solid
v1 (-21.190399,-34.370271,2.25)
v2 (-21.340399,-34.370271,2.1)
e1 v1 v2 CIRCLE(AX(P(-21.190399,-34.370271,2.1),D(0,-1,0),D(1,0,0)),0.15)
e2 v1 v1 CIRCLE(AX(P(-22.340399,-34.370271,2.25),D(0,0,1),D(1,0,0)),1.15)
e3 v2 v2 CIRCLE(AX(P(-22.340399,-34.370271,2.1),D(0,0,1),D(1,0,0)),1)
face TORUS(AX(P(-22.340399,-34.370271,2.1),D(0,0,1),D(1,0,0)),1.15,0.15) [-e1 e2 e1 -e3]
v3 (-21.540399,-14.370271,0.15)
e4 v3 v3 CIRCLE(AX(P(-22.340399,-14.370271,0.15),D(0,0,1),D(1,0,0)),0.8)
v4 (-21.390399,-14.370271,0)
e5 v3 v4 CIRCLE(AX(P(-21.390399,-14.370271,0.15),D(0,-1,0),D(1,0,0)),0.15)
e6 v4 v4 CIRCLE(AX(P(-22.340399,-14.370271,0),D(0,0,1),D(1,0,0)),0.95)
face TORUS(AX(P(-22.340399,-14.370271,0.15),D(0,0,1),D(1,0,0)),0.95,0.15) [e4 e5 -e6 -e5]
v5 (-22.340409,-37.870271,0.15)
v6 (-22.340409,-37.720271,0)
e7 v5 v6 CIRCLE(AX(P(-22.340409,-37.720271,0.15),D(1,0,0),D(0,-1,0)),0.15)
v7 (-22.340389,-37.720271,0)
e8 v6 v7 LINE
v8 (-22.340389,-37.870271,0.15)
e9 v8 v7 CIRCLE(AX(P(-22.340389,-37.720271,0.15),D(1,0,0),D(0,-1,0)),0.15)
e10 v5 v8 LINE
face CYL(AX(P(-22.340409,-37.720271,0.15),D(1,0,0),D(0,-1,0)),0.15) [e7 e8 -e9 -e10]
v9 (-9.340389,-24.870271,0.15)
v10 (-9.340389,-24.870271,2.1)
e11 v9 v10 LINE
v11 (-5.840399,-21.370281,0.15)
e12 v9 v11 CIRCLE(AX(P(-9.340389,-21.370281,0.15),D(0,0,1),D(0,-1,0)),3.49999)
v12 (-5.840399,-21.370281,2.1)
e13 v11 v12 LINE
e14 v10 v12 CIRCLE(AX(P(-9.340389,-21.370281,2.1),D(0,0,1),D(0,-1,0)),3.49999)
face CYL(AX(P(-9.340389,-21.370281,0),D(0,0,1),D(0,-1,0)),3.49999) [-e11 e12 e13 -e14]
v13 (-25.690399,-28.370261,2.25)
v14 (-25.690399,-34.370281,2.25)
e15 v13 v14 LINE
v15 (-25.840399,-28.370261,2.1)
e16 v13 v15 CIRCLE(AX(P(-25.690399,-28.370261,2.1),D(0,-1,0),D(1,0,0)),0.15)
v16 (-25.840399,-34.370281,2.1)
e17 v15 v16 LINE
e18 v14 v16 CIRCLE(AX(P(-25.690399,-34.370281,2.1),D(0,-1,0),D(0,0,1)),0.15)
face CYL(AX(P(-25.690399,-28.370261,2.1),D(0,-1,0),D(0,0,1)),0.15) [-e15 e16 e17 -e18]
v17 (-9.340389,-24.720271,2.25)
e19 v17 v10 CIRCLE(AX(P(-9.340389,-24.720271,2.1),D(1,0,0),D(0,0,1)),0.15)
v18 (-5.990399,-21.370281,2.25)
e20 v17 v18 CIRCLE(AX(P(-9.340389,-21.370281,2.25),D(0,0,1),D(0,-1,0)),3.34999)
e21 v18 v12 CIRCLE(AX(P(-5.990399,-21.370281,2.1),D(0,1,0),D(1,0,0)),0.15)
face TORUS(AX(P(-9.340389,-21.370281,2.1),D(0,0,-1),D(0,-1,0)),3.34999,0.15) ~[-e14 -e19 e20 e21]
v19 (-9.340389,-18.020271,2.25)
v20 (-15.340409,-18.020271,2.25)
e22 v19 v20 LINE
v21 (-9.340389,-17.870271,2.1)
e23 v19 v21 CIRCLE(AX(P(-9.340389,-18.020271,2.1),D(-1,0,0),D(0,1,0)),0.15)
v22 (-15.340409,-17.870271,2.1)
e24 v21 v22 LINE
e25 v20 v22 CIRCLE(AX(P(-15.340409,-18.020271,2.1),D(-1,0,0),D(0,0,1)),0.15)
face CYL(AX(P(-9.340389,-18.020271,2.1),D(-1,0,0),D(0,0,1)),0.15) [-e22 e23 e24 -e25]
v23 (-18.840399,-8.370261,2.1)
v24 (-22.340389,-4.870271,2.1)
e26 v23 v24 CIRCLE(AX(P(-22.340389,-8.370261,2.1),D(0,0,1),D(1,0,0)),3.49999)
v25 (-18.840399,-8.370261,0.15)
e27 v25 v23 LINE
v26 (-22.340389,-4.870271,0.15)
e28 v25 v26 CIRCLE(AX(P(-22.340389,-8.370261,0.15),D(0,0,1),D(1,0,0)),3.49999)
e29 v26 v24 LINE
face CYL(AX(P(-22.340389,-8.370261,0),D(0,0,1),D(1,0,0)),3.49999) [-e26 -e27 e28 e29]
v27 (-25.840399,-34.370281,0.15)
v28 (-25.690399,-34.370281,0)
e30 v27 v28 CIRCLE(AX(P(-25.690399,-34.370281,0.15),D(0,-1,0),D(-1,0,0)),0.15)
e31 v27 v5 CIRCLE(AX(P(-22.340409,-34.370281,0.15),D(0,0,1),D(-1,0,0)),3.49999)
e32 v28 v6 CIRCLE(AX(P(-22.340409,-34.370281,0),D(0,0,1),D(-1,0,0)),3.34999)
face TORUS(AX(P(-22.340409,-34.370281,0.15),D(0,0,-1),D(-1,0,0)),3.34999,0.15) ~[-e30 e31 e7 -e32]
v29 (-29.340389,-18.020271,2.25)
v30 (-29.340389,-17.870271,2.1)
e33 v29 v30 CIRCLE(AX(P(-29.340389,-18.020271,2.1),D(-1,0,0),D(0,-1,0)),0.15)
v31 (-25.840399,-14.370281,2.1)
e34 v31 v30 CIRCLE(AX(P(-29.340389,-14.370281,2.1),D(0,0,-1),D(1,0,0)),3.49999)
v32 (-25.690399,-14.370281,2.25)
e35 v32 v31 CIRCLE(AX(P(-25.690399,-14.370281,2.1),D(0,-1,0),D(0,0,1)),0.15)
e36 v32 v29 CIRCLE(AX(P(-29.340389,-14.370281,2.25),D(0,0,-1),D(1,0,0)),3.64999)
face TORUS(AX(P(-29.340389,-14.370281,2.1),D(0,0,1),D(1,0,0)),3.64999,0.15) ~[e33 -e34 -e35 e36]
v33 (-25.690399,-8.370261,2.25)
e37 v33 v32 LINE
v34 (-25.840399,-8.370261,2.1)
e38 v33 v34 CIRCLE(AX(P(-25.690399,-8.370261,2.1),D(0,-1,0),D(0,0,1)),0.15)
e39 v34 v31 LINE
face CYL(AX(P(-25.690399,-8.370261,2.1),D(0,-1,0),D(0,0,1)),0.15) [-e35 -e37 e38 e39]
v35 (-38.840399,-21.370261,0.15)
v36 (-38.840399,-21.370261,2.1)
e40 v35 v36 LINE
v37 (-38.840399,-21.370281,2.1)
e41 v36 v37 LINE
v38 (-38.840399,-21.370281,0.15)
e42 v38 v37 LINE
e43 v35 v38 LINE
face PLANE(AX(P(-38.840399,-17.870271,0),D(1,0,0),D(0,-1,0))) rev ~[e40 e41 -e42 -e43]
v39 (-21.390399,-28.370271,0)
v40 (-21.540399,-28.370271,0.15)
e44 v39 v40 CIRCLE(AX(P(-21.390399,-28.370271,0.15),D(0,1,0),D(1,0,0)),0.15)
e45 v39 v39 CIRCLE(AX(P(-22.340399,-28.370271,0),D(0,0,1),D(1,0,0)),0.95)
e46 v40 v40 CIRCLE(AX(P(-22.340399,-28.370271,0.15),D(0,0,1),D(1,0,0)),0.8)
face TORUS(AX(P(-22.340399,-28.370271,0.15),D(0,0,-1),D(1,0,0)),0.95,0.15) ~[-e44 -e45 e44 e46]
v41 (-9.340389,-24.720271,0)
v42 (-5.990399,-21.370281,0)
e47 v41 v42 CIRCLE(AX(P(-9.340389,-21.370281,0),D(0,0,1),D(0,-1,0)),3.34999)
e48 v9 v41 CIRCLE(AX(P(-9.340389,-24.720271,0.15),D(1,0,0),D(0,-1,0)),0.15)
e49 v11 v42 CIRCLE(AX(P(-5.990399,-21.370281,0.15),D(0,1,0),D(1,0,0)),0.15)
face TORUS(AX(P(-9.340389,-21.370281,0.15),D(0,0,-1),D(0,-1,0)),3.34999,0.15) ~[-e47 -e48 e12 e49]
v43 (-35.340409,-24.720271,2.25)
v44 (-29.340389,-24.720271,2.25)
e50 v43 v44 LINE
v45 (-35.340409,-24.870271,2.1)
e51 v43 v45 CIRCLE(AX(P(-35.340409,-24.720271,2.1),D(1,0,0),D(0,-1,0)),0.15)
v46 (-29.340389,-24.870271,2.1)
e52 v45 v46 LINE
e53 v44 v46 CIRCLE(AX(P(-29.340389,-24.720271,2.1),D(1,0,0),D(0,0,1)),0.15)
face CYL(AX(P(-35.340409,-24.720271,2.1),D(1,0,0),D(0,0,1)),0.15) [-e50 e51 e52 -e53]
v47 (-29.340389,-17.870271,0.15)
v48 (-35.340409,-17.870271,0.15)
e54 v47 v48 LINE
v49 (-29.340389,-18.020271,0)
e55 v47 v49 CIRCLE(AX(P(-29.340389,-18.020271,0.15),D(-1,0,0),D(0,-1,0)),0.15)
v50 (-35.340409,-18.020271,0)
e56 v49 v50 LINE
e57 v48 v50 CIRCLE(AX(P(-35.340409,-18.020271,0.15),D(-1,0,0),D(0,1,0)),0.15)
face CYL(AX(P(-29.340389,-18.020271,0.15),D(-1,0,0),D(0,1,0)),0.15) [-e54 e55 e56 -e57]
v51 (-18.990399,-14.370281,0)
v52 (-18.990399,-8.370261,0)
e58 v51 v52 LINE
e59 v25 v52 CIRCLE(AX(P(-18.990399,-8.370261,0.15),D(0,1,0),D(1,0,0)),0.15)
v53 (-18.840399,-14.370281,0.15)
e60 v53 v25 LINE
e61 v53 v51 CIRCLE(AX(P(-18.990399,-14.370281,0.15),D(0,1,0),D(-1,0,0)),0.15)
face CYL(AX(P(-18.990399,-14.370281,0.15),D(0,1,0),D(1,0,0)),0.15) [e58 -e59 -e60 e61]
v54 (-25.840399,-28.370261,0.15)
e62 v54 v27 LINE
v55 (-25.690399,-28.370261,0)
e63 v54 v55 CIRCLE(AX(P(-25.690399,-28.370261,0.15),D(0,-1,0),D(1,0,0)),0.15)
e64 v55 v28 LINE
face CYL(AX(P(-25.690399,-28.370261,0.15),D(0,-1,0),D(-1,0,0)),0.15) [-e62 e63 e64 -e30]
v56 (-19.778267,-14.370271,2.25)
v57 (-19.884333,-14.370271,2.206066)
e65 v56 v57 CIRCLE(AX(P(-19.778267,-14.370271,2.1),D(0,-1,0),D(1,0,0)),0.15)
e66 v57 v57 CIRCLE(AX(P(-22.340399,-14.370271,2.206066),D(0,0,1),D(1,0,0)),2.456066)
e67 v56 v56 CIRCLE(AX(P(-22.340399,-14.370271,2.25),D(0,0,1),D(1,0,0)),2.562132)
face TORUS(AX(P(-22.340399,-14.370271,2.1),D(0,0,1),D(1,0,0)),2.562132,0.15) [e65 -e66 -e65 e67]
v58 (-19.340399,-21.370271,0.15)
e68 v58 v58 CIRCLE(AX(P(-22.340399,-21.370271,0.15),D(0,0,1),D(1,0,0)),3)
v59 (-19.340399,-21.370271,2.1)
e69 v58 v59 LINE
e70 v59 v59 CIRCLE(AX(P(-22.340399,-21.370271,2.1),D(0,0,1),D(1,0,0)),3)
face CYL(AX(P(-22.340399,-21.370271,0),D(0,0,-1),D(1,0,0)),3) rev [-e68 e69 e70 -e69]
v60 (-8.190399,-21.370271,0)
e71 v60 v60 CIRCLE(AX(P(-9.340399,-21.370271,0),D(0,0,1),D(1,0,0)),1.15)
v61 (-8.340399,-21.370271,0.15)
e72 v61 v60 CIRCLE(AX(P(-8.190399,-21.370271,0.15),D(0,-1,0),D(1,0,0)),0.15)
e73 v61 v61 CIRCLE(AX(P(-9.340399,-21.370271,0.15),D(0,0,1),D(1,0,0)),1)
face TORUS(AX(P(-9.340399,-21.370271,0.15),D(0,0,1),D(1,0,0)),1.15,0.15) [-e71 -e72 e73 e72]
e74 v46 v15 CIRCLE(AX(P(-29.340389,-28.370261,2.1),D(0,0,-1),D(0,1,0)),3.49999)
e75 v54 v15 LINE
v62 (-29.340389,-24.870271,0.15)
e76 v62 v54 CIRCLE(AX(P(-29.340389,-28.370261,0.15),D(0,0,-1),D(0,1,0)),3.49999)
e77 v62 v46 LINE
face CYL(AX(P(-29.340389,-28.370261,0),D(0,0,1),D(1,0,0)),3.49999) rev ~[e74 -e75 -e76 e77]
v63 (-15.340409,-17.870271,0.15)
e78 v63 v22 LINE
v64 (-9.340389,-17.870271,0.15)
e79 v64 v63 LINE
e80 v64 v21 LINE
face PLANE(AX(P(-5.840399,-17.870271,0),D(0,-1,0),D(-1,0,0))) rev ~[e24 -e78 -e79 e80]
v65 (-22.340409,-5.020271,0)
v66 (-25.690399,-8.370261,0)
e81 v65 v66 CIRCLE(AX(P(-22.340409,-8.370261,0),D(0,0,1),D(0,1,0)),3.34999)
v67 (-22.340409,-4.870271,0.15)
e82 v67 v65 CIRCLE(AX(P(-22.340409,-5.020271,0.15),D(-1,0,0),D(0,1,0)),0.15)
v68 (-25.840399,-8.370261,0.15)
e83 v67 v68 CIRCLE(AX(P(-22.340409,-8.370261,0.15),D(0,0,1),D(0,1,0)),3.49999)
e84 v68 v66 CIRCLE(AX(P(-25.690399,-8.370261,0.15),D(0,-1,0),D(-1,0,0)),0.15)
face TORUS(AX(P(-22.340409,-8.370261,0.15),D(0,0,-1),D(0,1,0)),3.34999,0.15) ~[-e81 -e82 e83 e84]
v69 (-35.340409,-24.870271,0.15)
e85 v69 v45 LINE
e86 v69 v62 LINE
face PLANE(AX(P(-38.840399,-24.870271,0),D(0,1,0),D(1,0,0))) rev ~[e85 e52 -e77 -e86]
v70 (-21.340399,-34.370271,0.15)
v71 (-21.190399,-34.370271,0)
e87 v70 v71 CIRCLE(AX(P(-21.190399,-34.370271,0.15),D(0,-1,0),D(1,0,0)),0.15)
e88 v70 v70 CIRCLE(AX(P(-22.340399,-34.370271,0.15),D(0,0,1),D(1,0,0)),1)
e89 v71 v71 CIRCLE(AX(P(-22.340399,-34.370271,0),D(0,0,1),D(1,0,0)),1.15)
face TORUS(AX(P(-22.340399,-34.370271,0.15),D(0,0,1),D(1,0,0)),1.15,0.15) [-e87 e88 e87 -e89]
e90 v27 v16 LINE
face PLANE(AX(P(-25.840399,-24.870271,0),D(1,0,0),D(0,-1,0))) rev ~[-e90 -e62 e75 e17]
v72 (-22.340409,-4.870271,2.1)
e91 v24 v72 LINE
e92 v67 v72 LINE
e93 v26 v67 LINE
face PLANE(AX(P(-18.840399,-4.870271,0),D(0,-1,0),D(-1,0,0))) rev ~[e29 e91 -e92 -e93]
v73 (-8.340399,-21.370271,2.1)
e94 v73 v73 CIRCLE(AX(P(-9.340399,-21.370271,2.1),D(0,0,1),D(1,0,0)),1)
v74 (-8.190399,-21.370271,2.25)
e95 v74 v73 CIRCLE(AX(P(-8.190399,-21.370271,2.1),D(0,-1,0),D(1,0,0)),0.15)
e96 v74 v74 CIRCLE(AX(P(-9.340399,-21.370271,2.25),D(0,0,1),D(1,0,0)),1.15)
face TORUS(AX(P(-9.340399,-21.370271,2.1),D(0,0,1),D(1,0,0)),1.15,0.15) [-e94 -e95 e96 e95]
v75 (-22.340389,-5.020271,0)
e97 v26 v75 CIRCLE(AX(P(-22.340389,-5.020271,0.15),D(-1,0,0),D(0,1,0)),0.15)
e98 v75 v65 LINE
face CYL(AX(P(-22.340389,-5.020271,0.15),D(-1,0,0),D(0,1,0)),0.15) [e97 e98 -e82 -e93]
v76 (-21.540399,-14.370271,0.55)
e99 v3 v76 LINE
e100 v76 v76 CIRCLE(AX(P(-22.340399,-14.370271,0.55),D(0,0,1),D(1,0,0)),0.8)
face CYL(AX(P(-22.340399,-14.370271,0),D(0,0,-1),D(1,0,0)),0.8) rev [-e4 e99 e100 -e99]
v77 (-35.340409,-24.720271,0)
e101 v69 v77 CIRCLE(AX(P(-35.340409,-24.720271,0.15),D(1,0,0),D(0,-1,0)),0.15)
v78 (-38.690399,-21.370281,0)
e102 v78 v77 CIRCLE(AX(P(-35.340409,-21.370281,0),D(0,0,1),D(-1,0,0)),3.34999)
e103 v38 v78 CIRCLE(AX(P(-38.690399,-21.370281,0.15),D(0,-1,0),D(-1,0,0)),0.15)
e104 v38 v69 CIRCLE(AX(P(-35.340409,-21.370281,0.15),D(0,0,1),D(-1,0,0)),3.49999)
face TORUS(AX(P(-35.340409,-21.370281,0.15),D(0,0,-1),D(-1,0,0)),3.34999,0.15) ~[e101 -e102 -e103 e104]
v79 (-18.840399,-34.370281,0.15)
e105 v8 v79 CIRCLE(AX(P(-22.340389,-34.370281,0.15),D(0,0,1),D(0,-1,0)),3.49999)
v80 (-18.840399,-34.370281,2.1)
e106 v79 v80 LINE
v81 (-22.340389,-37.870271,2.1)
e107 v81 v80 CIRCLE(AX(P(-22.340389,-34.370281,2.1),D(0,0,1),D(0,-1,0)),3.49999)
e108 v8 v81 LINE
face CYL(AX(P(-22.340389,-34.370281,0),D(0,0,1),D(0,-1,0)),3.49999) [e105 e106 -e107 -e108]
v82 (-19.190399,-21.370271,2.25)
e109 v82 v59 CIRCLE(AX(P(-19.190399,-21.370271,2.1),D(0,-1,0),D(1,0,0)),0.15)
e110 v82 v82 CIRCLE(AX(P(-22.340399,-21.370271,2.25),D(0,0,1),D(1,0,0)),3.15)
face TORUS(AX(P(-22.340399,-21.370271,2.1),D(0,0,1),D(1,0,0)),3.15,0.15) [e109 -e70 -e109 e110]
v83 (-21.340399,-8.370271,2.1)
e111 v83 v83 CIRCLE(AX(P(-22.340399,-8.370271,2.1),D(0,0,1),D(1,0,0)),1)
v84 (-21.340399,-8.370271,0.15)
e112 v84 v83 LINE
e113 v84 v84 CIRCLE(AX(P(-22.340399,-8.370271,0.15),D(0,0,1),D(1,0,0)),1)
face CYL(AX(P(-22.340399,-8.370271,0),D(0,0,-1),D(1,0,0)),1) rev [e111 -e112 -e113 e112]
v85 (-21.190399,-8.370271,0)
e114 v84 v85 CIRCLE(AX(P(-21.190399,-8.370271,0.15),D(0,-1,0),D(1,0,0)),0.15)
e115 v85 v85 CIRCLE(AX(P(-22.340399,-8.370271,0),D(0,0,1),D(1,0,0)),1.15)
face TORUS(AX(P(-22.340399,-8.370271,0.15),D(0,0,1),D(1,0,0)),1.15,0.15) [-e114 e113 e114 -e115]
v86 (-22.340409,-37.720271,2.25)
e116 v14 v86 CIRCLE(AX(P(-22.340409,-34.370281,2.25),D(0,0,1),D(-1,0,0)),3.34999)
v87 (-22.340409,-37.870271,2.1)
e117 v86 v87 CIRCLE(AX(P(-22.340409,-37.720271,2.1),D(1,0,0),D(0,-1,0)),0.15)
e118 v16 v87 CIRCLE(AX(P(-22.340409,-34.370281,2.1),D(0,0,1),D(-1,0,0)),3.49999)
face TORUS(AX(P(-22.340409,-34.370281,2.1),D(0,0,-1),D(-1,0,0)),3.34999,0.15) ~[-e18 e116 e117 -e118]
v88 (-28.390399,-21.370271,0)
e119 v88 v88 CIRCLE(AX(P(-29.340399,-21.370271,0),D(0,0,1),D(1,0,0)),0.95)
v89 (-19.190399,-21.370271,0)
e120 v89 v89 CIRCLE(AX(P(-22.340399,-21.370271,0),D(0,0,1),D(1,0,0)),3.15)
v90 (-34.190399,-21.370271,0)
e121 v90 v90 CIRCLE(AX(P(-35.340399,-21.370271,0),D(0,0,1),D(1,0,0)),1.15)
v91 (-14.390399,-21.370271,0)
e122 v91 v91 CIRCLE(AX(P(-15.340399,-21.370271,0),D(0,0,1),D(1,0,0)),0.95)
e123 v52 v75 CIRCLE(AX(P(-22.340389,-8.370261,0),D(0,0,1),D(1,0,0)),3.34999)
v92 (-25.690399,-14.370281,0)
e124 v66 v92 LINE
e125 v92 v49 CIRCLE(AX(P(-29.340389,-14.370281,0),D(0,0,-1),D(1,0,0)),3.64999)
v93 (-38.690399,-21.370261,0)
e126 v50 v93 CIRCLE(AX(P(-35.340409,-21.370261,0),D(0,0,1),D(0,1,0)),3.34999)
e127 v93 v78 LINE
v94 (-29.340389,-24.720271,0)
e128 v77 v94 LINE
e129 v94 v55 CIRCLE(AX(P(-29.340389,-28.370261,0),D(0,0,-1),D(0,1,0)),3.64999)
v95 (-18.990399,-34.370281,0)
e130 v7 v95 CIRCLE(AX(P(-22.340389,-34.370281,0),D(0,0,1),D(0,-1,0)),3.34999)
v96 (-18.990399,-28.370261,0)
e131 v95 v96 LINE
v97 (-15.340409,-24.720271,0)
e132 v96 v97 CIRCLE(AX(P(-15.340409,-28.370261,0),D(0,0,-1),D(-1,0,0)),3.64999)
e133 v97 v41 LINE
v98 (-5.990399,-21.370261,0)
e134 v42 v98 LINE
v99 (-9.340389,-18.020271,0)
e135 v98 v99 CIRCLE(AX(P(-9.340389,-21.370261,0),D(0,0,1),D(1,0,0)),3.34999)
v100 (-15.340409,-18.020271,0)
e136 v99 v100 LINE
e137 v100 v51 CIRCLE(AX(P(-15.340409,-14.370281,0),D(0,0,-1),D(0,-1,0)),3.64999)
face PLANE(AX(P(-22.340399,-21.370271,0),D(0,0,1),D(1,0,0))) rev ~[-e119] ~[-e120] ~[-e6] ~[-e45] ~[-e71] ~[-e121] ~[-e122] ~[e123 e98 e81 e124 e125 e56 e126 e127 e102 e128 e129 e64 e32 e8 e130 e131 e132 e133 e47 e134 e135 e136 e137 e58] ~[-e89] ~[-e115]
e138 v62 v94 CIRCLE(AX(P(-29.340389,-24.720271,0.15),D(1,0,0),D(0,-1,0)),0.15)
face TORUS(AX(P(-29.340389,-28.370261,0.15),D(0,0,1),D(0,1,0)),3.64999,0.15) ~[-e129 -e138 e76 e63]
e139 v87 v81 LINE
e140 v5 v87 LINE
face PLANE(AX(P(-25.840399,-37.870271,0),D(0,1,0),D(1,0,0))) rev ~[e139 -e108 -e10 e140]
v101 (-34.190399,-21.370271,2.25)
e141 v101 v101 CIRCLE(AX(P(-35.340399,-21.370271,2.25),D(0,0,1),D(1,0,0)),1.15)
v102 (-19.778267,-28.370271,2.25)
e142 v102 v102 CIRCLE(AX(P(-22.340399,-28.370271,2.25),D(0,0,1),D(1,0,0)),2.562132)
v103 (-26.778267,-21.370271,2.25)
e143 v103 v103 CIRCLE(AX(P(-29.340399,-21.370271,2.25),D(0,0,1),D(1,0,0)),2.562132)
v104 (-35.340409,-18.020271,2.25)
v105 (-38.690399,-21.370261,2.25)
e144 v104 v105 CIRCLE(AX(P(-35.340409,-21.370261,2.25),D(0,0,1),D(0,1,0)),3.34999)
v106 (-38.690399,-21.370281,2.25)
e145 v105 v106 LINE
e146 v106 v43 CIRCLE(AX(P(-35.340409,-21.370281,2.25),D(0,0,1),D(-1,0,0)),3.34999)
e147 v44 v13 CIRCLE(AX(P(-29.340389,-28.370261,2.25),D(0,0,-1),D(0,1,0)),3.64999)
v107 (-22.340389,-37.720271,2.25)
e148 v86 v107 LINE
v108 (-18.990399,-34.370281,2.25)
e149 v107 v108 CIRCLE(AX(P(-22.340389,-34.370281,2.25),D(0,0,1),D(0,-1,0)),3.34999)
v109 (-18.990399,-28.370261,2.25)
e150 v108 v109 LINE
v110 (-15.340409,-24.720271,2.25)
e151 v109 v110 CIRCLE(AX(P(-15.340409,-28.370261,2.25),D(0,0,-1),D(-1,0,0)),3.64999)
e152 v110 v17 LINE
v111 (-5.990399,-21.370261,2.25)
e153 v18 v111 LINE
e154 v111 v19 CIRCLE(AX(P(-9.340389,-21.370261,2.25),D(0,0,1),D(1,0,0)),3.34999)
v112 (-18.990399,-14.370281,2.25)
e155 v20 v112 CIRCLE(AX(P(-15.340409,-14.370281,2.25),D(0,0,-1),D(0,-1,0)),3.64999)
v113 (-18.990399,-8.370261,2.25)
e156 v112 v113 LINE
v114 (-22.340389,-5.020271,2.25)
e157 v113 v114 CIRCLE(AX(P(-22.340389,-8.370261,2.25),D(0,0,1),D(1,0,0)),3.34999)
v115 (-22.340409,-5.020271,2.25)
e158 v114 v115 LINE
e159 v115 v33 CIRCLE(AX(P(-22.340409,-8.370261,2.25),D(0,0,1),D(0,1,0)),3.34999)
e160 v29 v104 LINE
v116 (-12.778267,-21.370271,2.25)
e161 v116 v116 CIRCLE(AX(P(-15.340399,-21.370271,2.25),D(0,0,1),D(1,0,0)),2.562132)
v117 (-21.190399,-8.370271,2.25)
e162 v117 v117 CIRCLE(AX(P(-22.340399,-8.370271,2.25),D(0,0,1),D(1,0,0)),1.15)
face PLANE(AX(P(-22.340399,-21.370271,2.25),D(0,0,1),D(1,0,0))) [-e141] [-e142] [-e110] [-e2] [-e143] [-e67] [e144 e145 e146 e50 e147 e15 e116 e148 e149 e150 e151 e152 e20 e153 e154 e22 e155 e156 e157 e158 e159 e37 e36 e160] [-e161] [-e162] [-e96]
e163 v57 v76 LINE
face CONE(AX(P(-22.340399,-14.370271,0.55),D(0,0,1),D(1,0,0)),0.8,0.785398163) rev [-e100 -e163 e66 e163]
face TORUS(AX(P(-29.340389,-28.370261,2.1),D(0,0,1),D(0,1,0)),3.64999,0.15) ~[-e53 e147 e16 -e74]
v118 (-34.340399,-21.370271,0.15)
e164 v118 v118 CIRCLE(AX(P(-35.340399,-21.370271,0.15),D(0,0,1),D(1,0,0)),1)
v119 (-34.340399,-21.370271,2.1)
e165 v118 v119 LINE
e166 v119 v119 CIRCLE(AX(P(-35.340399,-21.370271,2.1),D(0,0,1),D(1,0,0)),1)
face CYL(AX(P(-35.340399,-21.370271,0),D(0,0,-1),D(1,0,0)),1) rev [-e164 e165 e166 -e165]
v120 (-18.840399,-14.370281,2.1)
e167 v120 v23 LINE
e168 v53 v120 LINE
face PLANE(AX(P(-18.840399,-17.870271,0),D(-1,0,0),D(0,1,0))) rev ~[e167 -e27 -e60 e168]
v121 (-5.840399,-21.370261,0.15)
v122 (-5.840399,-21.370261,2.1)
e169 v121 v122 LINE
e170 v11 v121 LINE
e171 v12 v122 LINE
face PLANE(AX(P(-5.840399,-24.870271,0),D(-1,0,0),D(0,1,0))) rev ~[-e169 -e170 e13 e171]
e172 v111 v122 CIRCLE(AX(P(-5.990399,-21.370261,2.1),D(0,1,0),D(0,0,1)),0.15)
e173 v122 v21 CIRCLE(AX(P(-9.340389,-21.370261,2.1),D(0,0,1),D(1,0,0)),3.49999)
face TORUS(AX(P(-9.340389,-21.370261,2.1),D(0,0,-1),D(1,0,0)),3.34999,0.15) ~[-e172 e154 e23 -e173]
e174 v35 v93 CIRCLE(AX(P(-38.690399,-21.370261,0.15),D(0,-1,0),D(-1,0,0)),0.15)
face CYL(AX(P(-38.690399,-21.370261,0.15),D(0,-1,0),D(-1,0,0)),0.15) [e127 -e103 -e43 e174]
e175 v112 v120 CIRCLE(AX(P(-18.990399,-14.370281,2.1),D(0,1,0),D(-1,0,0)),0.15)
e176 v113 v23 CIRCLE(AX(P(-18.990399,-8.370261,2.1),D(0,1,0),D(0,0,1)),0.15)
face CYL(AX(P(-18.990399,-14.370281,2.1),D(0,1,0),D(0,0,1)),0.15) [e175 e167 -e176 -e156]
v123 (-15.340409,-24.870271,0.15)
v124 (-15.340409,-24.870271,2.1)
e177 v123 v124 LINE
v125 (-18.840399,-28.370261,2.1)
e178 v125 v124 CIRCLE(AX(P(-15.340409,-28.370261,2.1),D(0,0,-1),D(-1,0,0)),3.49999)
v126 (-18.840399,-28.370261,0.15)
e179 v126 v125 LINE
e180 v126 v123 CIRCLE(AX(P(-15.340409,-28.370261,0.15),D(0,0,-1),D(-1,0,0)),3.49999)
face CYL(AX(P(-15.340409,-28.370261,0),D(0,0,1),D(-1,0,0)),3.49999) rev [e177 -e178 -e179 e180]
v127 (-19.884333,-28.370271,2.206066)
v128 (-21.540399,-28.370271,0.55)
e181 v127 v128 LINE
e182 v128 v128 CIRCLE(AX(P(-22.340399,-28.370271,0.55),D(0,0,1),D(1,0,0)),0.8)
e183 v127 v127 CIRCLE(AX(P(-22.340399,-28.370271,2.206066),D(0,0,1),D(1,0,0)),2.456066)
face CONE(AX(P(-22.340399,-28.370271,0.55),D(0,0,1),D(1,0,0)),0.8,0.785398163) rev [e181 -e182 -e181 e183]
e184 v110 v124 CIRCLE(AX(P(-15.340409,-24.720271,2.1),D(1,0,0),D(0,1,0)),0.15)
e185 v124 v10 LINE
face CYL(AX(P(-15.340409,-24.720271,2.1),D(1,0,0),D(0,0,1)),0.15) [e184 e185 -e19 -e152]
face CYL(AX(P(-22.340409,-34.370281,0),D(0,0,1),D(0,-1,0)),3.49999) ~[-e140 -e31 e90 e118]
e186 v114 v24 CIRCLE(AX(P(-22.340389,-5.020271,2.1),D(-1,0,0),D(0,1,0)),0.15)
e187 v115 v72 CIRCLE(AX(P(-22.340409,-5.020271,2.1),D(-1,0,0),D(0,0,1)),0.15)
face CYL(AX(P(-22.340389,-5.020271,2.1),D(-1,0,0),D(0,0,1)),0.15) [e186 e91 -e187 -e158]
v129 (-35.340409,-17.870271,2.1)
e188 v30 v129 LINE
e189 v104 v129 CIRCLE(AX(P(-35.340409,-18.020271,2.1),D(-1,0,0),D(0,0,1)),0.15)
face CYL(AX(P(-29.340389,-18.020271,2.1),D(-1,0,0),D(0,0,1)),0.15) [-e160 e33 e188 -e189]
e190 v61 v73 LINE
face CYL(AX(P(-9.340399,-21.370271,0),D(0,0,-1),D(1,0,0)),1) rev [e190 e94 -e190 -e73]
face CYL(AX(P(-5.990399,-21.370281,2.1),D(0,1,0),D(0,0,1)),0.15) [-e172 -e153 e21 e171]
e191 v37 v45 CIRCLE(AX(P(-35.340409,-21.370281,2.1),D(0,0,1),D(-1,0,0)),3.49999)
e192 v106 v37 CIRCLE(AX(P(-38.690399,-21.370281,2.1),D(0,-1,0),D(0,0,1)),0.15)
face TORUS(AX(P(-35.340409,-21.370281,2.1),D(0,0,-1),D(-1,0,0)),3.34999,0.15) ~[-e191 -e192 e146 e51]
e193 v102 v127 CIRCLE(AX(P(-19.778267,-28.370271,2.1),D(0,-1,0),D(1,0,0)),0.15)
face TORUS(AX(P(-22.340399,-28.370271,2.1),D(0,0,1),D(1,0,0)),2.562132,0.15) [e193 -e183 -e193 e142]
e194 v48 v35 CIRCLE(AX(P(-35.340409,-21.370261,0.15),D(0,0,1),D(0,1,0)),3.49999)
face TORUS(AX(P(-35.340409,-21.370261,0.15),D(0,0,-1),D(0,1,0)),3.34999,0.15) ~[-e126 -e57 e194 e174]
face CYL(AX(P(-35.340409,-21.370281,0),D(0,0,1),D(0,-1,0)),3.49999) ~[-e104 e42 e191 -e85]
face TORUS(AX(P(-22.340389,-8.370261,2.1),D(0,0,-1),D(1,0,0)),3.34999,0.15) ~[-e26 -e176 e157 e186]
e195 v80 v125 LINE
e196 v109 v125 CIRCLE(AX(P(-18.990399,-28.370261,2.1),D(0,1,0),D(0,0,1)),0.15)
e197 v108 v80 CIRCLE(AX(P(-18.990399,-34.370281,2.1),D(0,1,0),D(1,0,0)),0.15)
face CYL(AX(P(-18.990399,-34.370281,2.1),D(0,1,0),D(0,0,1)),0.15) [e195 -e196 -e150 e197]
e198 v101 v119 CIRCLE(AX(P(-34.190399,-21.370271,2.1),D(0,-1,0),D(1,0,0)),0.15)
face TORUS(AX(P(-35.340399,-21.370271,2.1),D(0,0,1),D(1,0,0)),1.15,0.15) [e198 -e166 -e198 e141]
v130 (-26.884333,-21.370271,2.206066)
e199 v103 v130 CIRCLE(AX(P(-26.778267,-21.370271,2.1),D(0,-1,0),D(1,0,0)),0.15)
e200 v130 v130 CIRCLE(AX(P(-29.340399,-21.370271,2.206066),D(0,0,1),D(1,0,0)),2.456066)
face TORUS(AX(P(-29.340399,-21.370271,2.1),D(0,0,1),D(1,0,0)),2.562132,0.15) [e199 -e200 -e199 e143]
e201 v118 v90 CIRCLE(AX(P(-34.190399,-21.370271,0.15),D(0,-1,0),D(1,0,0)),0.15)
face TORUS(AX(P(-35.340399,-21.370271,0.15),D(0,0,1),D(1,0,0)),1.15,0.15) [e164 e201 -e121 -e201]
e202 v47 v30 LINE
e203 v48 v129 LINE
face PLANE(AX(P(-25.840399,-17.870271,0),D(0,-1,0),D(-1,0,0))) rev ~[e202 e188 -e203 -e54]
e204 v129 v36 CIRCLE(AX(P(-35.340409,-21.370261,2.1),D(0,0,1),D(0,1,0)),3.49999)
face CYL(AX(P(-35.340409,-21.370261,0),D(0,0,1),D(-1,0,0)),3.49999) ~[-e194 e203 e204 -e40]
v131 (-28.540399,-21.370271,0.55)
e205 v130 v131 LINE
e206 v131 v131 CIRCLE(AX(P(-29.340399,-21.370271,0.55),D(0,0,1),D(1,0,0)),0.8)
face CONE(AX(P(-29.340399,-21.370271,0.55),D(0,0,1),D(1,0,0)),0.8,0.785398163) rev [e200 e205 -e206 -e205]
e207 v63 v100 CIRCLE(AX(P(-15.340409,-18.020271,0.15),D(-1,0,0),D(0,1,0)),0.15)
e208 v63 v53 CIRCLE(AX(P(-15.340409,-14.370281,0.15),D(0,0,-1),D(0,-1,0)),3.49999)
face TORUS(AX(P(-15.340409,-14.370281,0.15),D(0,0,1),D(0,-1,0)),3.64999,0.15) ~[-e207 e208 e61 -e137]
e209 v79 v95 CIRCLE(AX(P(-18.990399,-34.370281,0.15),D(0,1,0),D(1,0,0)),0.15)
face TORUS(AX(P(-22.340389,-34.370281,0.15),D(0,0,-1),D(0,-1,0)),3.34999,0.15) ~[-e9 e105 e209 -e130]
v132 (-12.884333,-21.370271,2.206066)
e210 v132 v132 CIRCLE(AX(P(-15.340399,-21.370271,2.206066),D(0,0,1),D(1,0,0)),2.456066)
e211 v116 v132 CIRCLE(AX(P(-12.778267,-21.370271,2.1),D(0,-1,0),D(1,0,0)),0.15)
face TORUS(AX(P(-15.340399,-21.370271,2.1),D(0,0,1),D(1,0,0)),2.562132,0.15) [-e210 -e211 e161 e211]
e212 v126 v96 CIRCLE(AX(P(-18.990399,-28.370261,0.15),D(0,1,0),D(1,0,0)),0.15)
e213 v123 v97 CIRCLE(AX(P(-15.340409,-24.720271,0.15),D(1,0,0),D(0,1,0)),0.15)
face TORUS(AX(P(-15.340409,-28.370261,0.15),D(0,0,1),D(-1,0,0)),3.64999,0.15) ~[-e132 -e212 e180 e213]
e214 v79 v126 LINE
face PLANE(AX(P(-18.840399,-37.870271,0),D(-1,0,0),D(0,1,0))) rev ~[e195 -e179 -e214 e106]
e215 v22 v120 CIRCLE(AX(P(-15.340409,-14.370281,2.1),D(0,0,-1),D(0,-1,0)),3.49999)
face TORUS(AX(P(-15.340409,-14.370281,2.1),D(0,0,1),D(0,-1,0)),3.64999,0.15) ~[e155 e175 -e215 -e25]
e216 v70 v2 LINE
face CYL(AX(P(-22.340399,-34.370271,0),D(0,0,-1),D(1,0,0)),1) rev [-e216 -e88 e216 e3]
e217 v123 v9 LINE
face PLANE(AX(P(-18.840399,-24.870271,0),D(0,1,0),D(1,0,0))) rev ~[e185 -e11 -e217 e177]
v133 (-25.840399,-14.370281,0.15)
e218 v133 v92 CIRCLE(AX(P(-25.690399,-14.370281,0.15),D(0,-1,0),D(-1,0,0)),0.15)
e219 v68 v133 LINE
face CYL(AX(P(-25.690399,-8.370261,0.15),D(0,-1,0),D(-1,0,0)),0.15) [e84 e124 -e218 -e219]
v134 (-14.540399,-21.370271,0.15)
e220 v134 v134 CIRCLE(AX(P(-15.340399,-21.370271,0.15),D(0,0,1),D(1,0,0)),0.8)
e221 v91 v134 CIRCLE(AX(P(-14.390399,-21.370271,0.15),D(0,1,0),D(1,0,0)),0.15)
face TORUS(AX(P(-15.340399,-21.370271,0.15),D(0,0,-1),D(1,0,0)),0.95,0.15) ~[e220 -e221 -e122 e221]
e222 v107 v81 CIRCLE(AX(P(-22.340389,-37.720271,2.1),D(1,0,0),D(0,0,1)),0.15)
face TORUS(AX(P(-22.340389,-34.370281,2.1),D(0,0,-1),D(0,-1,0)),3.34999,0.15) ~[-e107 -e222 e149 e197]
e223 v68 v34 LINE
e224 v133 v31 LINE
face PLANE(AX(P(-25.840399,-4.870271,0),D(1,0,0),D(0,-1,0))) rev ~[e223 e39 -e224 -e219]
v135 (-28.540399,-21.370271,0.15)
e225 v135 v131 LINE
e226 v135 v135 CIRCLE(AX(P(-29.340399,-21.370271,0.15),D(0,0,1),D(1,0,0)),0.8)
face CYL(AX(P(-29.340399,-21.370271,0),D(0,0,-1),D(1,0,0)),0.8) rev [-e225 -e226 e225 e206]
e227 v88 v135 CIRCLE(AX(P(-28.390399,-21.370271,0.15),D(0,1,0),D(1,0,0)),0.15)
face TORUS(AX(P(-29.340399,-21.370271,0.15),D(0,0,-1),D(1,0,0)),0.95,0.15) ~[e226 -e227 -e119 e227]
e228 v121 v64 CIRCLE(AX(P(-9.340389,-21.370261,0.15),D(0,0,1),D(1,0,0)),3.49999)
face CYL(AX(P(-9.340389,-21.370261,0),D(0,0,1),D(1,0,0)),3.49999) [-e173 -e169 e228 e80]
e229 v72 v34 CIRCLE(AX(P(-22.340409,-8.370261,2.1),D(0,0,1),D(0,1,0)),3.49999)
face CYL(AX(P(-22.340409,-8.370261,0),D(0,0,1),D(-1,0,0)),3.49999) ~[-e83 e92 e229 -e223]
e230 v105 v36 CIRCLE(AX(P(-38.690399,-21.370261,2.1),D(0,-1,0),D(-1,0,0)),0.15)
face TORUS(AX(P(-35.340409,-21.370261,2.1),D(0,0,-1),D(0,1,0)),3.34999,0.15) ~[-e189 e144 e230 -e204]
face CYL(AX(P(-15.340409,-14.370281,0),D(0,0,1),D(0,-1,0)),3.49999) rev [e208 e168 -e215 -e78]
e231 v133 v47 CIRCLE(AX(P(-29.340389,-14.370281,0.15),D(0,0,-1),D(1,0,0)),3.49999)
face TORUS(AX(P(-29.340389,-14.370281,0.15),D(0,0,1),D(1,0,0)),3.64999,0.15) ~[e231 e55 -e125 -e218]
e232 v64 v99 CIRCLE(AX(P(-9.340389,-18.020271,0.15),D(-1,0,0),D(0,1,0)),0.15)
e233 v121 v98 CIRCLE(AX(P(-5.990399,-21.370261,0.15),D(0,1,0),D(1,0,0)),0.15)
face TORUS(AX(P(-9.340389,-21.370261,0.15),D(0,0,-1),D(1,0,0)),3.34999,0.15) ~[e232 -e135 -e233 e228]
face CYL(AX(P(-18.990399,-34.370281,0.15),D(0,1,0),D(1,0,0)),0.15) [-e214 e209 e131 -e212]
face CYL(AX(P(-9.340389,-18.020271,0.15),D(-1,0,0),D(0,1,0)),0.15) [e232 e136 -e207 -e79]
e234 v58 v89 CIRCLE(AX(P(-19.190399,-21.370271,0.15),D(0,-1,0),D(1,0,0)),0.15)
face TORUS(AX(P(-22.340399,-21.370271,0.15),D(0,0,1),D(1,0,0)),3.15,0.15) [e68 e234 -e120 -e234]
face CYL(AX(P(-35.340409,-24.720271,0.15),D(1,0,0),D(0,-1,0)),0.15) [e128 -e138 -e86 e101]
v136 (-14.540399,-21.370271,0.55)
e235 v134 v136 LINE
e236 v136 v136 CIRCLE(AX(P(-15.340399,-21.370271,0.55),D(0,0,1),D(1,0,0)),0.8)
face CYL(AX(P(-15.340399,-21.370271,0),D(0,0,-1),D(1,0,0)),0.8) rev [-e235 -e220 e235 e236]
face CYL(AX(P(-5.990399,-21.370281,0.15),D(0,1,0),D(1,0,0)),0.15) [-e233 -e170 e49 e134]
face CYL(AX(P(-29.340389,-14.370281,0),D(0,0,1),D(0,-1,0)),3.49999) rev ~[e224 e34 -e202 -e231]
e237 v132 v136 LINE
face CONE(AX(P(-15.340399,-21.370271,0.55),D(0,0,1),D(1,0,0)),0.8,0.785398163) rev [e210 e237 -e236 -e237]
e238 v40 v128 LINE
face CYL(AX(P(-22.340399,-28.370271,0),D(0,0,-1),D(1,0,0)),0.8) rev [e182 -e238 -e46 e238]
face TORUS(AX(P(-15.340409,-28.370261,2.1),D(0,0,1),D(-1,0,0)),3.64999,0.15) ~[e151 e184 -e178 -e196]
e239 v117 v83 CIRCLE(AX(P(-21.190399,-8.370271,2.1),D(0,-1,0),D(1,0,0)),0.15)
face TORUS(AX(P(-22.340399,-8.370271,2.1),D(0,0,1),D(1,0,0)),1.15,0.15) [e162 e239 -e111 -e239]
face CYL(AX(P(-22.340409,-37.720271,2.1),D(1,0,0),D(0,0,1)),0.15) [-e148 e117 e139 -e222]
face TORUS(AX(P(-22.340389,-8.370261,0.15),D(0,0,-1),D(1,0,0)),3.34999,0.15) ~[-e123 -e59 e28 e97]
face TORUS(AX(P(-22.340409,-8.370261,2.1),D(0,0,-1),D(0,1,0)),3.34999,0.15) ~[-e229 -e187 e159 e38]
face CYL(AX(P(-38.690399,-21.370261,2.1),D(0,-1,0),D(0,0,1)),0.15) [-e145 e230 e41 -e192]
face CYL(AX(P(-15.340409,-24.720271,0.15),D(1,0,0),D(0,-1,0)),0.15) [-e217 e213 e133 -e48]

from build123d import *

# Parameters (mm, degrees)
F0_R     = 1
F0_R_2   = 0.8
F0_R_3   = 3
F1_DEPTH = 2.25
F2_R     = 3.49999
F3_SIZE  = 1.7
F4_R     = 0.15


# Not quite as in the source:
# - a fillet or chamfer is up to 0.001 mm smaller than in the source, because OpenCascade refuses the exact size


with BuildPart() as f1:
    # F0 (on Top) → F1 (new body)
    with BuildSketch(Plane.XY):
        Polygon((-25.8403990492, -37.8702705037), (-18.8403990492, -37.8702705037), (-18.8403990492, -24.8702705037), (-5.8403990492, -24.8702705037), (-5.8403990492, -17.8702705037), (-18.8403990492, -17.8702705037), (-18.8403990492, -4.8702705037), (-25.8403990492, -4.8702705037), (-25.8403990492, -17.8702705037), (-38.8403990492, -17.8702705037), (-38.8403990492, -24.8702705037), (-25.8403990492, -24.8702705037), align=None)
        with Locations((-22.3403990492, -34.3702705037)):
            Circle(F0_R, mode=Mode.SUBTRACT)
        with Locations((-22.3403990492, -28.3702705037)):
            Circle(F0_R_2, mode=Mode.SUBTRACT)
        with Locations((-35.3403990492, -21.3702705037)):
            Circle(F0_R, mode=Mode.SUBTRACT)
        with Locations((-29.3403990492, -21.3702705037)):
            Circle(F0_R_2, mode=Mode.SUBTRACT)
        with Locations((-22.3403990492, -21.3702705037)):
            Circle(F0_R_3, mode=Mode.SUBTRACT)
        with Locations((-15.3403990492, -21.3702705037)):
            Circle(F0_R_2, mode=Mode.SUBTRACT)
        with Locations((-22.3403990492, -14.3702705037)):
            Circle(F0_R_2, mode=Mode.SUBTRACT)
        with Locations((-9.3403990492, -21.3702705037)):
            Circle(F0_R, mode=Mode.SUBTRACT)
        with Locations((-22.3403990492, -8.3702705037)):
            Circle(F0_R, mode=Mode.SUBTRACT)
    extrude(amount=F1_DEPTH)

    # F2 (radius 3.5 in the source; OpenCascade refuses exactly that, so slightly less here)
    f2_edges = [f1.edges().sort_by_distance(p)[0] for p in [
        (-25.840399, -4.870271, 1.125),
        (-18.840399, -4.870271, 1.125),
        (-5.840399, -17.870271, 1.125),
        (-5.840399, -24.870271, 1.125),
        (-18.840399, -37.870271, 1.125),
        (-25.840399, -37.870271, 1.125),
        (-38.840399, -24.870271, 1.125),
        (-38.840399, -17.870271, 1.125),
        (-25.840399, -24.870271, 1.125),
        (-18.840399, -24.870271, 1.125),
        (-18.840399, -17.870271, 1.125),
        (-25.840399, -17.870271, 1.125),
    ]]
    fillet(f2_edges, radius=F2_R)

    # F3
    f3_edges = [f1.edges().sort_by_distance(p)[0] for p in [
        (-23.140399, -14.370271, 2.25),
        (-16.140399, -21.370271, 2.25),
        (-23.140399, -28.370271, 2.25),
        (-30.140399, -21.370271, 2.25),
    ]]
    chamfer(f3_edges, length=F3_SIZE)

    # F4
    f4_edges = [f1.edges().sort_by_distance(p)[0] for p in [
        (-24.840399, -14.370271, 2.25),
        (-25.840399, -11.370271, 2.25),
        (-24.815276, -5.895394, 2.25),
        (-26.865522, -16.845147, 2.25),
        (-22.340399, -4.870271, 2.25),
        (-32.340399, -17.870271, 2.25),
        (-19.865522, -5.895394, 2.25),
        (-37.815276, -18.895394, 2.25),
        (-18.840399, -11.370271, 2.25),
        (-38.840399, -21.370271, 2.25),
        (-17.815276, -16.845147, 2.25),
        (-37.815276, -23.845147, 2.25),
        (-12.340399, -17.870271, 2.25),
        (-32.340399, -24.870271, 2.25),
        (-6.865522, -18.895394, 2.25),
        (-26.865522, -25.895394, 2.25),
        (-5.840399, -21.370271, 2.25),
        (-25.840399, -31.370271, 2.25),
        (-6.865522, -23.845147, 2.25),
        (-24.815276, -36.845147, 2.25),
        (-12.340399, -24.870271, 2.25),
        (-22.340399, -37.870271, 2.25),
        (-17.815276, -25.895394, 2.25),
        (-19.865522, -36.845147, 2.25),
        (-18.840399, -31.370271, 2.25),
        (-23.340399, -34.370271, 2.25),
        (-36.340399, -21.370271, 2.25),
        (-25.340399, -21.370271, 2.25),
        (-10.340399, -21.370271, 2.25),
        (-23.340399, -8.370271, 2.25),
        (-17.840399, -21.370271, 2.25),
        (-24.840399, -28.370271, 2.25),
        (-31.840399, -21.370271, 2.25),
        (-25.840399, -11.370271, 0),
        (-24.815276, -5.895394, 0),
        (-26.865522, -16.845147, 0),
        (-22.340399, -4.870271, 0),
        (-32.340399, -17.870271, 0),
        (-19.865522, -5.895394, 0),
        (-37.815276, -18.895394, 0),
        (-18.840399, -11.370271, 0),
        (-38.840399, -21.370271, 0),
        (-17.815276, -16.845147, 0),
        (-37.815276, -23.845147, 0),
        (-12.340399, -17.870271, 0),
        (-32.340399, -24.870271, 0),
        (-6.865522, -18.895394, 0),
        (-26.865522, -25.895394, 0),
        (-5.840399, -21.370271, 0),
        (-25.840399, -31.370271, 0),
        (-6.865522, -23.845147, 0),
        (-24.815276, -36.845147, 0),
        (-12.340399, -24.870271, 0),
        (-22.340399, -37.870271, 0),
        (-17.815276, -25.895394, 0),
        (-19.865522, -36.845147, 0),
        (-18.840399, -31.370271, 0),
        (-23.340399, -34.370271, 0),
        (-23.140399, -28.370271, 0),
        (-36.340399, -21.370271, 0),
        (-30.140399, -21.370271, 0),
        (-25.340399, -21.370271, 0),
        (-16.140399, -21.370271, 0),
        (-23.140399, -14.370271, 0),
        (-10.340399, -21.370271, 0),
        (-23.340399, -8.370271, 0),
    ]]
    fillet(f4_edges, radius=F4_R)


solid = f1.part
